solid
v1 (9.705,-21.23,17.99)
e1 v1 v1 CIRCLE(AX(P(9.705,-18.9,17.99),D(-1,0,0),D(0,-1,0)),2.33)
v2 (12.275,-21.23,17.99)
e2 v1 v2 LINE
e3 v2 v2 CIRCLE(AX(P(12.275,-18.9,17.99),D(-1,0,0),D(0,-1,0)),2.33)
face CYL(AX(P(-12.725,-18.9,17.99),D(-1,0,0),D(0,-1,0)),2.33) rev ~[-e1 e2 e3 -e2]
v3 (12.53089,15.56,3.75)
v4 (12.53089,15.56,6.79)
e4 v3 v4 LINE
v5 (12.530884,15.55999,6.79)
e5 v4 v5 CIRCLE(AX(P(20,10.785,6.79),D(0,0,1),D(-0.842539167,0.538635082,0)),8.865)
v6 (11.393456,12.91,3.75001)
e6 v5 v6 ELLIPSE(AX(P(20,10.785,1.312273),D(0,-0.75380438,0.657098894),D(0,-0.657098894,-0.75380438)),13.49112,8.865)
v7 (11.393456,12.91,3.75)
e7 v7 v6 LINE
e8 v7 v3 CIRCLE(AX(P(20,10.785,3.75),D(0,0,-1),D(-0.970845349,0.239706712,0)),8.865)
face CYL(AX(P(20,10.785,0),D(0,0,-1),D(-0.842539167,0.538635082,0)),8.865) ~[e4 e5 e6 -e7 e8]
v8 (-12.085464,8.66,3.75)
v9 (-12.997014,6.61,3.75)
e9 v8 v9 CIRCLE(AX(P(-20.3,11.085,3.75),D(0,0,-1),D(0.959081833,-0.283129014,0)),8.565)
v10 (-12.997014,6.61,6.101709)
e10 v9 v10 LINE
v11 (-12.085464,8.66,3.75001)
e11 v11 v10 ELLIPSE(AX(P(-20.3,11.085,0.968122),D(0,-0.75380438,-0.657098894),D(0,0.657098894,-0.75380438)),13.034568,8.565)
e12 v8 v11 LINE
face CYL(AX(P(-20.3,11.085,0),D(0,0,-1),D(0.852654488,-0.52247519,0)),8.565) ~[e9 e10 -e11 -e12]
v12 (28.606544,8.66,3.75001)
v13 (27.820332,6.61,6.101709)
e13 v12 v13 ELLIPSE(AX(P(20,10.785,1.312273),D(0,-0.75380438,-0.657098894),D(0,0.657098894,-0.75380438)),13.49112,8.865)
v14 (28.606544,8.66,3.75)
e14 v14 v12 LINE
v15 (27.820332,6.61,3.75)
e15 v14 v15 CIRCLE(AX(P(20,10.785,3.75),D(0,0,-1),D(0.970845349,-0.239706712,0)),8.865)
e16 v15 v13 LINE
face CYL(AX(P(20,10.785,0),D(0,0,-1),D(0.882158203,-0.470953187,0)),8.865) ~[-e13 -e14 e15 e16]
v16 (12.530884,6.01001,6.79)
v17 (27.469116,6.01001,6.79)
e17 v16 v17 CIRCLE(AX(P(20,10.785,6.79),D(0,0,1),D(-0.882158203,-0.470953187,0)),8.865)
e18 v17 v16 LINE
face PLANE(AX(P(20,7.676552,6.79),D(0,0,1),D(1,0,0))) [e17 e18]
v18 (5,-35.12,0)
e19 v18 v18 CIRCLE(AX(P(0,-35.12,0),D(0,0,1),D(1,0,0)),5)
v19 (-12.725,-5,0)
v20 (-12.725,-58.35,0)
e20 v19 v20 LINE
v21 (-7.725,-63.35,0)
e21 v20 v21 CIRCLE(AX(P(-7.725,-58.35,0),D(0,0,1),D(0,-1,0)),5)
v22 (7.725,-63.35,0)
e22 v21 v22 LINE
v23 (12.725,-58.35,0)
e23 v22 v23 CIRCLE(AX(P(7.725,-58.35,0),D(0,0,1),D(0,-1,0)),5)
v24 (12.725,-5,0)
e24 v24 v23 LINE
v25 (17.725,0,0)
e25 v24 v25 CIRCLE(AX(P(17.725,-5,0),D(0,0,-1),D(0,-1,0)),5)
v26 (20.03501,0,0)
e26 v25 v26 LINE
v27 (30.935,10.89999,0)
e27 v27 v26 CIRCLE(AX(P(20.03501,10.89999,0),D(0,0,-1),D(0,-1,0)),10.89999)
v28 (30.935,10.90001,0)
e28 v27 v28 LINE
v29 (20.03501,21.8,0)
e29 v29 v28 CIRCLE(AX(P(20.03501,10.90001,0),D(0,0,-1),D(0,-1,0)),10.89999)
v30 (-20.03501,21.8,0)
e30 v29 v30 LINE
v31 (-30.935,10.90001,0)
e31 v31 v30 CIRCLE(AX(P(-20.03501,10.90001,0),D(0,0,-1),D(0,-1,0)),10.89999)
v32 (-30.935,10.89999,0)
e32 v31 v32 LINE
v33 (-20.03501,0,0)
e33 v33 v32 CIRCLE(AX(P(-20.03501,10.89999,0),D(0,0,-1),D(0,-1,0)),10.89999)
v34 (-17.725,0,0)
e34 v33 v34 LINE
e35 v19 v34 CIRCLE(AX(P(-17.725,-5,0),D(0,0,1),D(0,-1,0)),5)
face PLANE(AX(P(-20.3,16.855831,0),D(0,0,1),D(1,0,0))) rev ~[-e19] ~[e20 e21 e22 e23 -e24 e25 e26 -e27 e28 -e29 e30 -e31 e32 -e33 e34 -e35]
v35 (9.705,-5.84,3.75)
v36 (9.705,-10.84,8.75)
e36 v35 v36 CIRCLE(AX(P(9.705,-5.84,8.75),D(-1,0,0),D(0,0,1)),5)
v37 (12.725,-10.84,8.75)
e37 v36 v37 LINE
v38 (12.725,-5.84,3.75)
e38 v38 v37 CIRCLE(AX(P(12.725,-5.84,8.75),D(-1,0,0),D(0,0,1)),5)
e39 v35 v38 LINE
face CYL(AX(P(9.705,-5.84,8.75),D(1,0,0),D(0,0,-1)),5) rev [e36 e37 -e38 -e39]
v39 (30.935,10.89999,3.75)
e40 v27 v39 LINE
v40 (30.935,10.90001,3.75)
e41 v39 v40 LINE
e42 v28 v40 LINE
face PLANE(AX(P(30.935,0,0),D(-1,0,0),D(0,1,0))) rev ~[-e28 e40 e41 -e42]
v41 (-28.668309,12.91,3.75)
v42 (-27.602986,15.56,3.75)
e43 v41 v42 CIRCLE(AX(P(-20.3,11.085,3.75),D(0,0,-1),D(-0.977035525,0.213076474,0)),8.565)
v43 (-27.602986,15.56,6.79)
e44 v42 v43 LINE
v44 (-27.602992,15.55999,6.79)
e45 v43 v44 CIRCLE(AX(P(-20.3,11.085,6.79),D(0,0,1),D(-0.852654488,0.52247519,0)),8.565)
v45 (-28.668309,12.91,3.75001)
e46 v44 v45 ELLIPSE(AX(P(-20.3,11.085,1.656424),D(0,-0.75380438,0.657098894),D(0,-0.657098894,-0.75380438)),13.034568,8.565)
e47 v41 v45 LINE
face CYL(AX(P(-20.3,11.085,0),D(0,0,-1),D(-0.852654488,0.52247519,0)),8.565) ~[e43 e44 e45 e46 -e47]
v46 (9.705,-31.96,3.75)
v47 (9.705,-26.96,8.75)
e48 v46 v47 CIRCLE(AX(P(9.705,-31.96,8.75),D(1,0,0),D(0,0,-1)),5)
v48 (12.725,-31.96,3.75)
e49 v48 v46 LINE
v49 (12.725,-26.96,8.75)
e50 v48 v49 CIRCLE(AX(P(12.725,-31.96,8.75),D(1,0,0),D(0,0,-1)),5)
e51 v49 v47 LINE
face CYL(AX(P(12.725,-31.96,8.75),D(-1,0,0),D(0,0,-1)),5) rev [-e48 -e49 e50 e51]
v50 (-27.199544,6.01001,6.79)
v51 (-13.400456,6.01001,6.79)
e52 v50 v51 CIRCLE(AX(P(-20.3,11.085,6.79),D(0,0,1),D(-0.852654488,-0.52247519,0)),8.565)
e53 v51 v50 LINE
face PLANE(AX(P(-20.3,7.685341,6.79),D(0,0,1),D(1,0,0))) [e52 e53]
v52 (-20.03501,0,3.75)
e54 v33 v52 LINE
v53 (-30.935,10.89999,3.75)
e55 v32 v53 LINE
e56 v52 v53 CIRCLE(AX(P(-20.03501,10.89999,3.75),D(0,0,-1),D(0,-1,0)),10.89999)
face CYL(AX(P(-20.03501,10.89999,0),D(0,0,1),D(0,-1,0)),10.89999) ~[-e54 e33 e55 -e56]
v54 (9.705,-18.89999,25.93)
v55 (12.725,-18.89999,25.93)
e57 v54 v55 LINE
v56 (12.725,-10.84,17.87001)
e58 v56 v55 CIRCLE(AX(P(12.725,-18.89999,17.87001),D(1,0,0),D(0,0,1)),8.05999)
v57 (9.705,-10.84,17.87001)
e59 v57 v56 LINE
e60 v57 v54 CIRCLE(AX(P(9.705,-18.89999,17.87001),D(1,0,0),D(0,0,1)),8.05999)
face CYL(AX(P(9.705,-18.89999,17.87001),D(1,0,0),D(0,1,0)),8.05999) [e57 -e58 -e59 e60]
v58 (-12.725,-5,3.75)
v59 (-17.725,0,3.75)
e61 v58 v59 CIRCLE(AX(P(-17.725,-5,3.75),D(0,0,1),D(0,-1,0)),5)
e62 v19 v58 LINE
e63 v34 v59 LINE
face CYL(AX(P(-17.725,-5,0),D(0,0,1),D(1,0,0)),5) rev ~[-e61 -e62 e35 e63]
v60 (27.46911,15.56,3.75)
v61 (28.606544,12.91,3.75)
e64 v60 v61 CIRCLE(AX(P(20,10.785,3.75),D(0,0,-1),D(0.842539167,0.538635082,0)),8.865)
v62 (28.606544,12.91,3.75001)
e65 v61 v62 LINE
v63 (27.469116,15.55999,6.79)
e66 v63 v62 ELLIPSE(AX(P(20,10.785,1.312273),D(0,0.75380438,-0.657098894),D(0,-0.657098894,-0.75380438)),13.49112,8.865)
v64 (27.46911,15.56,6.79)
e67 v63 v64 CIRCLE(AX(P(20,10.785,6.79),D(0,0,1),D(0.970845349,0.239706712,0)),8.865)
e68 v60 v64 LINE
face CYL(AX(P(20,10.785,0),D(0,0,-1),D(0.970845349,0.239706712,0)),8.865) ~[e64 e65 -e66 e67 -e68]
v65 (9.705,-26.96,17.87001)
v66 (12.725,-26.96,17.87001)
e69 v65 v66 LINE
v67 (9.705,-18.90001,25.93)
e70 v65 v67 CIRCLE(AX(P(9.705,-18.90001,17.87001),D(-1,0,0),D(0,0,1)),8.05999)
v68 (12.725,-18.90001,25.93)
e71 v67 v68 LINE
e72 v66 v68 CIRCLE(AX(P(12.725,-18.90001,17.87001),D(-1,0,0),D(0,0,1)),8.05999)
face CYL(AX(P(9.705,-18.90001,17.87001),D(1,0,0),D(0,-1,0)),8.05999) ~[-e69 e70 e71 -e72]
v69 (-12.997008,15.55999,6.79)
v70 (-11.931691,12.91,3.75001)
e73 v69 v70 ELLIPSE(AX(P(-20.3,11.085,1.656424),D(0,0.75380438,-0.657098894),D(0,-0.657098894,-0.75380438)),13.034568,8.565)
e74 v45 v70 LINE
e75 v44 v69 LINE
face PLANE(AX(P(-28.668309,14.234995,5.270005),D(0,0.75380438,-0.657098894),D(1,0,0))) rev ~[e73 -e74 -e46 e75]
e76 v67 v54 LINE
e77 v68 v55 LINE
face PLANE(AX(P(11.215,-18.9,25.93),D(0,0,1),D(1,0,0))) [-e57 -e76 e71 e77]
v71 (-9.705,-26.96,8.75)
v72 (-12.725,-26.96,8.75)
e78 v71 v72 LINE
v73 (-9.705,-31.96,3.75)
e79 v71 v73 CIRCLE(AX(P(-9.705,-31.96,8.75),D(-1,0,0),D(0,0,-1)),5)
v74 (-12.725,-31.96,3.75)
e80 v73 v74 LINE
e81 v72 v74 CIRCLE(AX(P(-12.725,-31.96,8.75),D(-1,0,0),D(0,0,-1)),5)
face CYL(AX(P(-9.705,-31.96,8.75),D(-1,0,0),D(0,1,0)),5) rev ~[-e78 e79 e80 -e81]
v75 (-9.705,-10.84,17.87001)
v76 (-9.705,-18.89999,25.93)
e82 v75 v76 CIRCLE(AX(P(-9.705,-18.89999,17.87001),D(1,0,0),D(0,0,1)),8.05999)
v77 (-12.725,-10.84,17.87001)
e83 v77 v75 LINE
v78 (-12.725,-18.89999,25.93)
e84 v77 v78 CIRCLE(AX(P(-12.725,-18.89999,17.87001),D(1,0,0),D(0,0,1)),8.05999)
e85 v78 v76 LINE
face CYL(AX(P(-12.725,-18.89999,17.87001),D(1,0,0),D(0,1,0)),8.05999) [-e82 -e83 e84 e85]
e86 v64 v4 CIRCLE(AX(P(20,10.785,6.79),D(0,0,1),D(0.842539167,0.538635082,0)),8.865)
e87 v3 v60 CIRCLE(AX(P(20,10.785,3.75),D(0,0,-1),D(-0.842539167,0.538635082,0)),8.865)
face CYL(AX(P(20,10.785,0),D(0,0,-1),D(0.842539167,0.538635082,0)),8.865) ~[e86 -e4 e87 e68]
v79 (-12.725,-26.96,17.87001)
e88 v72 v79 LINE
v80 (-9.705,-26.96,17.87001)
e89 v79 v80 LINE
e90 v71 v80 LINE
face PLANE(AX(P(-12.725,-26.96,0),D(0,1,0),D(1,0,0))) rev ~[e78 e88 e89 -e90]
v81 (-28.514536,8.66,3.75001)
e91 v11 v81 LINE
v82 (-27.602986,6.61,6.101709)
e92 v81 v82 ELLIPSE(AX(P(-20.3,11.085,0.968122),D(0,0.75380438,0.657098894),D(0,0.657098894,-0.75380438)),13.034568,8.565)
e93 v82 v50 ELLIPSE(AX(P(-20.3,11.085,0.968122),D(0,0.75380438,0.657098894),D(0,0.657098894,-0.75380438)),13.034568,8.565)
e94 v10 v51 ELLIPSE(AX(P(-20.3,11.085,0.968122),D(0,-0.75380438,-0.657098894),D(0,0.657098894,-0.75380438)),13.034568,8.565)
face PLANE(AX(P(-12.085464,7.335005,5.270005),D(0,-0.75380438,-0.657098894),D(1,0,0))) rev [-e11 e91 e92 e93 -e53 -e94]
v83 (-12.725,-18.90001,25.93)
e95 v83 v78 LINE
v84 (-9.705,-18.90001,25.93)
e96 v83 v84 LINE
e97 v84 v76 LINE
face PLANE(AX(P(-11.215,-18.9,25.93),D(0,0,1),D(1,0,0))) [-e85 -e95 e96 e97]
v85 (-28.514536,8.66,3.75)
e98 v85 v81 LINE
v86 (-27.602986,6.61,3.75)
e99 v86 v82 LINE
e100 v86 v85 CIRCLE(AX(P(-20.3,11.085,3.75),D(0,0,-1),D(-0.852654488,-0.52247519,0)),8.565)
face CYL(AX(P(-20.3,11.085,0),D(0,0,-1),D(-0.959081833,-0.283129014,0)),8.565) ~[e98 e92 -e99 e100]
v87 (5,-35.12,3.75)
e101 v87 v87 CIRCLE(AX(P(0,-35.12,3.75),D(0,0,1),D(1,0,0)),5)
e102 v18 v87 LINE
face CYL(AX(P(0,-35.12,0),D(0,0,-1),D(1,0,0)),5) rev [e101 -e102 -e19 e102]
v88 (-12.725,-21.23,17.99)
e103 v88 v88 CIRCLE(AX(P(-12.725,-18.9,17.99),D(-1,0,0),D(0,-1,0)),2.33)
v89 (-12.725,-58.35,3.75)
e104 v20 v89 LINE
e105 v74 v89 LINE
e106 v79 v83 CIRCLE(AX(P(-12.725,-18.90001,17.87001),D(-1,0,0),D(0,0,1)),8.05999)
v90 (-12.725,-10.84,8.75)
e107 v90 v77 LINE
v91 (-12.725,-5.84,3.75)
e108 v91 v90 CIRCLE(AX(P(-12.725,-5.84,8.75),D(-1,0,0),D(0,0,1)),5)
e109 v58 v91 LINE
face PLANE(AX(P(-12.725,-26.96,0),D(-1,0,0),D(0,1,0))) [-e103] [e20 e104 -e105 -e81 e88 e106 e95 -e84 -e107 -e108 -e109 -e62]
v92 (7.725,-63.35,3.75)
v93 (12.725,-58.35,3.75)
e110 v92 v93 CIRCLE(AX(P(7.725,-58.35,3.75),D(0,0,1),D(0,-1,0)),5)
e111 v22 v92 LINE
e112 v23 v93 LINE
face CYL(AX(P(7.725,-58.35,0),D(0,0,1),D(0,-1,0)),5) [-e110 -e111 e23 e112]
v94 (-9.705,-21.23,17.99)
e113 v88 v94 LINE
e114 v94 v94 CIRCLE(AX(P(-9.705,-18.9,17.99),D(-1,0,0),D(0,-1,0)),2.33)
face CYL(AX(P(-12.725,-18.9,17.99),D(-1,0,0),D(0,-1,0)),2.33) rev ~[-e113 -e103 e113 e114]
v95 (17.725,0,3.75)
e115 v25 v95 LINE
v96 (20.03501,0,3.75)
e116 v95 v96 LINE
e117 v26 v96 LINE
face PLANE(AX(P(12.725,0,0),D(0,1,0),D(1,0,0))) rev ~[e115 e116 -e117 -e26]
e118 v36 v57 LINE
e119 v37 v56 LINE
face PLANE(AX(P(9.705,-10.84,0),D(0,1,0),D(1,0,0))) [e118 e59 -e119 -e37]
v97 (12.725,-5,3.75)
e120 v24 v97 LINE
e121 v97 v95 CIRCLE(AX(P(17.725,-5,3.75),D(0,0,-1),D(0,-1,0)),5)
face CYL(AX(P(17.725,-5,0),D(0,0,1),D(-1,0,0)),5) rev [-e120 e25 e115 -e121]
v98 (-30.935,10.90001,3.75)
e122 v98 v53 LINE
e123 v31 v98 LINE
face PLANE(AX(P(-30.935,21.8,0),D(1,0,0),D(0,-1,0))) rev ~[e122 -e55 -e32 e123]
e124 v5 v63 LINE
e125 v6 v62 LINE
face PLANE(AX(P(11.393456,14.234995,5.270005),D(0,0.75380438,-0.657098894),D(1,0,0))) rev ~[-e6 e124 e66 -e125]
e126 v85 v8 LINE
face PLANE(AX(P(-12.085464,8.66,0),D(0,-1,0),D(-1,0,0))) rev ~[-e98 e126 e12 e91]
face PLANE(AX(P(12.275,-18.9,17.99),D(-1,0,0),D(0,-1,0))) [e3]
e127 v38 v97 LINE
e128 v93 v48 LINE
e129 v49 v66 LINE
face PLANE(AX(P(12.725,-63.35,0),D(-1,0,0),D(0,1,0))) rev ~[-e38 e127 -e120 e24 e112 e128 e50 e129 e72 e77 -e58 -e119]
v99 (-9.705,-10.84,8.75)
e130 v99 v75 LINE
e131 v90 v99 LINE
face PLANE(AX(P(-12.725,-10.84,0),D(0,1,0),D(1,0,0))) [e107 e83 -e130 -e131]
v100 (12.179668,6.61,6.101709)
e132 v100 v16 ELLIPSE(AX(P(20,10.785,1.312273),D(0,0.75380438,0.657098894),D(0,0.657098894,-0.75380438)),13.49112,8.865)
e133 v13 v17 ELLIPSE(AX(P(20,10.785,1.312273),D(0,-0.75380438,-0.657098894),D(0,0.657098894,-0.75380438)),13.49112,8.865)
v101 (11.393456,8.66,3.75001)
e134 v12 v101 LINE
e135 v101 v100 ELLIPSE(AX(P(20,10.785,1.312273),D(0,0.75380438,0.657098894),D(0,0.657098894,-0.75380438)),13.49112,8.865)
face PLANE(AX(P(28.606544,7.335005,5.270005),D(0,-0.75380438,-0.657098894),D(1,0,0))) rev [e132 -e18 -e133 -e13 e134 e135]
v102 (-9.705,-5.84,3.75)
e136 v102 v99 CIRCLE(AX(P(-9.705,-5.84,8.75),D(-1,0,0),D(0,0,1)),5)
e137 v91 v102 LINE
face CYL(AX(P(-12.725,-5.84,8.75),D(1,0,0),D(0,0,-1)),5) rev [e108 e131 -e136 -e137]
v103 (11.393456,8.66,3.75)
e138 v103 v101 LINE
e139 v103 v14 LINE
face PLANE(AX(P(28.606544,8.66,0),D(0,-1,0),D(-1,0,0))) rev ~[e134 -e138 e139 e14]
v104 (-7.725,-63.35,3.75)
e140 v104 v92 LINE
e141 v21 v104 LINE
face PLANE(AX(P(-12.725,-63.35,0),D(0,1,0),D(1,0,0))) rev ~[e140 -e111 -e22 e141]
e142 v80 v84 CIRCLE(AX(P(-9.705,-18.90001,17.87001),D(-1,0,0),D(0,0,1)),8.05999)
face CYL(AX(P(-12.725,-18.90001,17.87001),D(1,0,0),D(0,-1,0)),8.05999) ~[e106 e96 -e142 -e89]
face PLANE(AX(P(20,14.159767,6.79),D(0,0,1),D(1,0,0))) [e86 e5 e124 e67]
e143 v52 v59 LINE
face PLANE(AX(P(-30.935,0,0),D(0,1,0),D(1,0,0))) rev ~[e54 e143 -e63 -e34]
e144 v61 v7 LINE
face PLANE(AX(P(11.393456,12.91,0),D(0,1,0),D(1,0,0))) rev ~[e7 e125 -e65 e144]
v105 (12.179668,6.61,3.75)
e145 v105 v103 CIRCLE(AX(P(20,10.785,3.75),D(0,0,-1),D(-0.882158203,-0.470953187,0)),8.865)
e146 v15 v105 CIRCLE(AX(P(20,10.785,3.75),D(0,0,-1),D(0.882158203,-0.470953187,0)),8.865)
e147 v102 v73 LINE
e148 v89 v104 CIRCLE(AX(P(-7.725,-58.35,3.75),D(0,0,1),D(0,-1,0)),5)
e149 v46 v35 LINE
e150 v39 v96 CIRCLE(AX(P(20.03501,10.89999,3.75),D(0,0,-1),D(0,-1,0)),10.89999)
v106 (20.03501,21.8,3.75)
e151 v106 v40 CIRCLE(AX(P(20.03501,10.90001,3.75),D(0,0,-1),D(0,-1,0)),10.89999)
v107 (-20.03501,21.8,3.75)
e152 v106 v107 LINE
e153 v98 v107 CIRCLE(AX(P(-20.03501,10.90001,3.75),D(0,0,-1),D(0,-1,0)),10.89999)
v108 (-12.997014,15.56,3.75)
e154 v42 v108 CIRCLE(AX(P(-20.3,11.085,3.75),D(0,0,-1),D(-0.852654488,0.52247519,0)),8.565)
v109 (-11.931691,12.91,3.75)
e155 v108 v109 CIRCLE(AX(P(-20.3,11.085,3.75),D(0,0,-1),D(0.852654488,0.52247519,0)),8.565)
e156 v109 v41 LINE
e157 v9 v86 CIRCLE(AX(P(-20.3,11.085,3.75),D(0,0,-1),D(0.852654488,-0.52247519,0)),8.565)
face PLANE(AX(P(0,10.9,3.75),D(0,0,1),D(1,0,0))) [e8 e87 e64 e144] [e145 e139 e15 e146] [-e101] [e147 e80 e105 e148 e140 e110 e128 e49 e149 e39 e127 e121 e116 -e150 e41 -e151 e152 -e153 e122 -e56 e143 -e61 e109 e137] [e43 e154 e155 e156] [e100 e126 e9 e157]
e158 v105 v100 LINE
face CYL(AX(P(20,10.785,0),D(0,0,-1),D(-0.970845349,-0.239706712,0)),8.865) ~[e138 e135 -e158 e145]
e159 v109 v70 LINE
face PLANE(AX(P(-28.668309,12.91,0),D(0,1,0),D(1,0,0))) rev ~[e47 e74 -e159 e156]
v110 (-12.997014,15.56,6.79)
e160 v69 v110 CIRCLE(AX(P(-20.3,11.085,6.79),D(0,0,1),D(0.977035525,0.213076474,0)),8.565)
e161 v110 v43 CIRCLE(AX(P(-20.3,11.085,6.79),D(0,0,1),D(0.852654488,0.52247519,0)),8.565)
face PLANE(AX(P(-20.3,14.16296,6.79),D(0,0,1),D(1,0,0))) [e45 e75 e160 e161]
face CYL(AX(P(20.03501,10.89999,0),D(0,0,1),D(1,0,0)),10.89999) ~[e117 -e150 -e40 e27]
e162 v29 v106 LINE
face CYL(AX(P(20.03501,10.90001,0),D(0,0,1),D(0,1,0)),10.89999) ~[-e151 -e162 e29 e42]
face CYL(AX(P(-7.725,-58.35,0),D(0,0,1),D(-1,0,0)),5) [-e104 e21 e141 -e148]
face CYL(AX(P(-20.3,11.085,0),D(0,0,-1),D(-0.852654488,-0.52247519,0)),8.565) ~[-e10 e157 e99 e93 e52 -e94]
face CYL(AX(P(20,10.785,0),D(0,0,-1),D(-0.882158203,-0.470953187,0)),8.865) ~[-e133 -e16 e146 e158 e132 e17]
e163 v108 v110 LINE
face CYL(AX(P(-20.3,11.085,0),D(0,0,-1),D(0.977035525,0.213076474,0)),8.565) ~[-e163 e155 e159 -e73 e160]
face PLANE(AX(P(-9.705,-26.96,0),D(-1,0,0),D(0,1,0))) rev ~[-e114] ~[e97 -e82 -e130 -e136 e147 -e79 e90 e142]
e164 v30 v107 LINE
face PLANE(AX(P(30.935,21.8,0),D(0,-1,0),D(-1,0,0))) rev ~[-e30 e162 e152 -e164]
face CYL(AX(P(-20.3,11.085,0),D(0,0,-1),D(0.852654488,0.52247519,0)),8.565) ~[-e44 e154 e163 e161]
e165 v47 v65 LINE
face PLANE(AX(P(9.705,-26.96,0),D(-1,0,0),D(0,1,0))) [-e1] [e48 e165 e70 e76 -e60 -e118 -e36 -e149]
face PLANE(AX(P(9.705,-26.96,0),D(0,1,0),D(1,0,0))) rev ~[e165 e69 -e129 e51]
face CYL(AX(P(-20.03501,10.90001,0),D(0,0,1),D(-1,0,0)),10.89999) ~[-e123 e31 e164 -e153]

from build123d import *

# Parameters (mm, degrees)
F0_R       = 5
F1_DEPTH   = 3.75
F0_W       = 3.02
F0_H       = 16.12
F2_DEPTH   = 25.93
F3_DEPTH   = 6.79
F4_DEPTH   = 6.79
F5_SIZE2   = 3.03999
F5_SIZE    = 2.64999
F5_2_SIZE2 = 3.03999
F5_2_SIZE  = 2.64999
F6_SIZE2   = 2.64999
F6_SIZE    = 3.03999
F6_2_SIZE2 = 2.64999
F6_2_SIZE  = 3.03999
F7_R       = 2.33
F8_DEPTH   = 25
F9_R       = 8.05999
F10_R      = 5
F11_R      = 10.89999


# Not quite as in the source:
# - a fillet or chamfer is up to 0.001 mm smaller than in the source, because OpenCascade refuses the exact size


with BuildPart() as f1:
    # F0 (on Top) → F1 (new body)
    with BuildSketch(Plane.XY):
        Polygon((-30.935, 0), (-12.725, 0), (12.725, 0), (30.935, 0), (30.935, 21.8), (-30.935, 21.8), align=None)
        with BuildLine():
            ThreePointArc((-11.9316907323, 12.91), (-11.7843146524, 12.0027843216), (-11.735, 11.085))
            ThreePointArc((-11.735, 11.085), (-11.8230688054, 9.8599030561), (-12.0854641032, 8.66))
            ThreePointArc((-12.0854641032, 8.66), (-12.4738263465, 7.6050242897), (-12.9970143092, 6.61))
            ThreePointArc((-12.9970143092, 6.61), (-20.3, 2.52), (-27.6029856908, 6.61))
            ThreePointArc((-27.6029856908, 6.61), (-28.1261736535, 7.6050242897), (-28.5145358968, 8.66))
            ThreePointArc((-28.5145358968, 8.66), (-28.8593991283, 10.7753040808), (-28.6683092677, 12.91))
            ThreePointArc((-28.6683092677, 12.91), (-28.2468859573, 14.2797188579), (-27.6029856908, 15.56))
            ThreePointArc((-27.6029856908, 15.56), (-20.3, 19.65), (-12.9970143092, 15.56))
            ThreePointArc((-12.9970143092, 15.56), (-12.3531140427, 14.2797188579), (-11.9316907323, 12.91))
        make_face(mode=Mode.SUBTRACT)
        with BuildLine():
            ThreePointArc((28.6065440218, 12.91), (28.8001487986, 11.8553299132), (28.865, 10.785))
            ThreePointArc((28.865, 10.785), (28.8001487986, 9.7146700868), (28.6065440218, 8.66))
            ThreePointArc((28.6065440218, 8.66), (28.2771488358, 7.6105658536), (27.8203324738, 6.61))
            ThreePointArc((27.8203324738, 6.61), (20, 1.92), (12.1796675262, 6.61))
            ThreePointArc((12.1796675262, 6.61), (11.7228511642, 7.6105658536), (11.3934559782, 8.66))
            ThreePointArc((11.3934559782, 8.66), (11.135, 10.785), (11.3934559782, 12.91))
            ThreePointArc((11.3934559782, 12.91), (11.8536949602, 14.2815610531), (12.5308902806, 15.56))
            ThreePointArc((12.5308902806, 15.56), (20, 19.65), (27.4691097194, 15.56))
            ThreePointArc((27.4691097194, 15.56), (28.1463050398, 14.2815610531), (28.6065440218, 12.91))
        make_face(mode=Mode.SUBTRACT)
        Polygon((12.725, 0), (-12.725, 0), (-12.725, -10.84), (-9.705, -10.84), (-9.705, -26.96), (-12.725, -26.96), (-12.725, -63.35), (12.725, -63.35), (12.725, -26.96), (9.705, -26.96), (9.705, -10.84), (12.725, -10.84), align=None)
        with Locations((0, -35.12)):
            Circle(F0_R, mode=Mode.SUBTRACT)
        with BuildLine():
            ThreePointArc((-12.0854641032, 8.66), (-11.8230688054, 9.8599030561), (-11.735, 11.085))
            ThreePointArc((-11.735, 11.085), (-11.7843146524, 12.0027843216), (-11.9316907323, 12.91))
            Line((-11.9316907323, 12.91), (-28.6683092677, 12.91))
            ThreePointArc((-28.6683092677, 12.91), (-28.8593991283, 10.7753040808), (-28.5145358968, 8.66))
            Line((-28.5145358968, 8.66), (-12.0854641032, 8.66))
        make_face()
        with BuildLine():
            ThreePointArc((28.6065440218, 8.66), (28.8001487986, 9.7146700868), (28.865, 10.785))
            ThreePointArc((28.865, 10.785), (28.8001487986, 11.8553299132), (28.6065440218, 12.91))
            Line((28.6065440218, 12.91), (11.3934559782, 12.91))
            ThreePointArc((11.3934559782, 12.91), (11.135, 10.785), (11.3934559782, 8.66))
            Line((11.3934559782, 8.66), (28.6065440218, 8.66))
        make_face()
    extrude(amount=F1_DEPTH)

    # F0 (on Top) → F2 (join)
    with BuildSketch(Plane.XY):
        with Locations((-11.215, -18.9)):
            Rectangle(F0_W, F0_H)
        with Locations((11.215, -18.9)):
            Rectangle(F0_W, F0_H)
    extrude(amount=F2_DEPTH)

    # F0 (on Top) → F3 (join)
    with BuildSketch(Plane.XY):
        with BuildLine():
            Line((-27.6029856908, 15.56), (-12.9970143092, 15.56))
            ThreePointArc((-12.9970143092, 15.56), (-20.3, 19.65), (-27.6029856908, 15.56))
        make_face()
        with BuildLine():
            ThreePointArc((-27.6029856908, 6.61), (-20.3, 2.52), (-12.9970143092, 6.61))
            Line((-12.9970143092, 6.61), (-27.6029856908, 6.61))
        make_face()
        with BuildLine():
            ThreePointArc((12.1796675262, 6.61), (20, 1.92), (27.8203324738, 6.61))
            Line((27.8203324738, 6.61), (12.1796675262, 6.61))
        make_face()
        with BuildLine():
            Line((12.5308902806, 15.56), (27.4691097194, 15.56))
            ThreePointArc((27.4691097194, 15.56), (20, 19.65), (12.5308902806, 15.56))
        make_face()
    extrude(amount=F3_DEPTH)

    # F0 (on Top) → F4 (join)
    with BuildSketch(Plane.XY):
        with BuildLine():
            Line((-28.6683092677, 12.91), (-11.9316907323, 12.91))
            ThreePointArc((-11.9316907323, 12.91), (-12.3531140427, 14.2797188579), (-12.9970143092, 15.56))
            Line((-12.9970143092, 15.56), (-27.6029856908, 15.56))
            ThreePointArc((-27.6029856908, 15.56), (-28.2468859573, 14.2797188579), (-28.6683092677, 12.91))
        make_face()
        with BuildLine():
            ThreePointArc((-12.9970143092, 6.61), (-12.4738263465, 7.6050242897), (-12.0854641032, 8.66))
            Line((-12.0854641032, 8.66), (-28.5145358968, 8.66))
            ThreePointArc((-28.5145358968, 8.66), (-28.1261736535, 7.6050242897), (-27.6029856908, 6.61))
            Line((-27.6029856908, 6.61), (-12.9970143092, 6.61))
        make_face()
        with BuildLine():
            ThreePointArc((27.8203324738, 6.61), (28.2771488358, 7.6105658536), (28.6065440218, 8.66))
            Line((28.6065440218, 8.66), (11.3934559782, 8.66))
            ThreePointArc((11.3934559782, 8.66), (11.7228511642, 7.6105658536), (12.1796675262, 6.61))
            Line((12.1796675262, 6.61), (27.8203324738, 6.61))
        make_face()
        with BuildLine():
            Line((11.3934559782, 12.91), (28.6065440218, 12.91))
            ThreePointArc((28.6065440218, 12.91), (28.1463050398, 14.2815610531), (27.4691097194, 15.56))
            Line((27.4691097194, 15.56), (12.5308902806, 15.56))
            ThreePointArc((12.5308902806, 15.56), (11.8536949602, 14.2815610531), (11.3934559782, 12.91))
        make_face()
    extrude(amount=F4_DEPTH)

    # F5 (size 2.65 and 3.04 in the source; OpenCascade refuses exactly that, so slightly less here)
    f5_edges = [f1.edges().sort_by_distance(p)[0] for p in [
        (-20.3, 12.91, 6.79),
    ]]
    f5_side = f1.faces().sort_by_distance((-20.3, 15.724453, 6.79))[0]
    chamfer(f5_edges, length=F5_SIZE, length2=F5_SIZE2, reference=f5_side)

    # F5#2 (size 2.65 and 3.04 in the source; OpenCascade refuses exactly that, so slightly less here)
    f5_2_edges = [f1.edges().sort_by_distance(p)[0] for p in [
        (20, 12.91, 6.79),
    ]]
    f5_2_side = f1.faces().sort_by_distance((20, 15.719253, 6.79))[0]
    chamfer(f5_2_edges, length=F5_2_SIZE, length2=F5_2_SIZE2, reference=f5_2_side)

    # F6 (size 3.04 and 2.65 in the source; OpenCascade refuses exactly that, so slightly less here)
    f6_edges = [f1.edges().sort_by_distance(p)[0] for p in [
        (-20.3, 8.66, 6.79),
    ]]
    f6_side = f1.faces().sort_by_distance((-20.3, 8.66, 5.27))[0]
    chamfer(f6_edges, length=F6_SIZE, length2=F6_SIZE2, reference=f6_side)

    # F6#2 (size 3.04 and 2.65 in the source; OpenCascade refuses exactly that, so slightly less here)
    f6_2_edges = [f1.edges().sort_by_distance(p)[0] for p in [
        (20, 8.66, 6.79),
    ]]
    f6_2_side = f1.faces().sort_by_distance((20, 8.66, 5.27))[0]
    chamfer(f6_2_edges, length=F6_2_SIZE, length2=F6_2_SIZE2, reference=f6_2_side)

    # F7 (on face) → F8 (cut)
    with BuildSketch(Plane(origin=(-12.725, 0, 0), x_dir=(0, -1, 0), z_dir=(-1, 0, 0))):
        with Locations((18.9, 17.99)):
            Circle(F7_R)
    extrude(amount=-F8_DEPTH, mode=Mode.SUBTRACT)

    # F9 (radius 8.06 in the source; OpenCascade refuses exactly that, so slightly less here)
    f9_edges = [f1.edges().sort_by_distance(p)[0] for p in [
        (-11.215, -10.84, 25.93),
        (11.215, -10.84, 25.93),
        (11.215, -26.96, 25.93),
        (-11.215, -26.96, 25.93),
    ]]
    fillet(f9_edges, radius=F9_R)

    # F10
    f10_edges = [f1.edges().sort_by_distance(p)[0] for p in [
        (-12.725, 0, 1.875),
        (12.725, 0, 1.875),
        (12.725, -63.35, 1.875),
        (-12.725, -63.35, 1.875),
        (-11.215, -26.96, 3.75),
        (11.215, -26.96, 3.75),
        (11.215, -10.84, 3.75),
        (-11.215, -10.84, 3.75),
    ]]
    fillet(f10_edges, radius=F10_R)

    # F11 (radius 10.9 in the source; OpenCascade refuses exactly that, so slightly less here)
    f11_edges = [f1.edges().sort_by_distance(p)[0] for p in [
        (-30.935, 21.8, 1.875),
        (-30.935, 0, 1.875),
        (30.935, 21.8, 1.875),
        (30.935, 0, 1.875),
    ]]
    fillet(f11_edges, radius=F11_R)


solid = f1.part
